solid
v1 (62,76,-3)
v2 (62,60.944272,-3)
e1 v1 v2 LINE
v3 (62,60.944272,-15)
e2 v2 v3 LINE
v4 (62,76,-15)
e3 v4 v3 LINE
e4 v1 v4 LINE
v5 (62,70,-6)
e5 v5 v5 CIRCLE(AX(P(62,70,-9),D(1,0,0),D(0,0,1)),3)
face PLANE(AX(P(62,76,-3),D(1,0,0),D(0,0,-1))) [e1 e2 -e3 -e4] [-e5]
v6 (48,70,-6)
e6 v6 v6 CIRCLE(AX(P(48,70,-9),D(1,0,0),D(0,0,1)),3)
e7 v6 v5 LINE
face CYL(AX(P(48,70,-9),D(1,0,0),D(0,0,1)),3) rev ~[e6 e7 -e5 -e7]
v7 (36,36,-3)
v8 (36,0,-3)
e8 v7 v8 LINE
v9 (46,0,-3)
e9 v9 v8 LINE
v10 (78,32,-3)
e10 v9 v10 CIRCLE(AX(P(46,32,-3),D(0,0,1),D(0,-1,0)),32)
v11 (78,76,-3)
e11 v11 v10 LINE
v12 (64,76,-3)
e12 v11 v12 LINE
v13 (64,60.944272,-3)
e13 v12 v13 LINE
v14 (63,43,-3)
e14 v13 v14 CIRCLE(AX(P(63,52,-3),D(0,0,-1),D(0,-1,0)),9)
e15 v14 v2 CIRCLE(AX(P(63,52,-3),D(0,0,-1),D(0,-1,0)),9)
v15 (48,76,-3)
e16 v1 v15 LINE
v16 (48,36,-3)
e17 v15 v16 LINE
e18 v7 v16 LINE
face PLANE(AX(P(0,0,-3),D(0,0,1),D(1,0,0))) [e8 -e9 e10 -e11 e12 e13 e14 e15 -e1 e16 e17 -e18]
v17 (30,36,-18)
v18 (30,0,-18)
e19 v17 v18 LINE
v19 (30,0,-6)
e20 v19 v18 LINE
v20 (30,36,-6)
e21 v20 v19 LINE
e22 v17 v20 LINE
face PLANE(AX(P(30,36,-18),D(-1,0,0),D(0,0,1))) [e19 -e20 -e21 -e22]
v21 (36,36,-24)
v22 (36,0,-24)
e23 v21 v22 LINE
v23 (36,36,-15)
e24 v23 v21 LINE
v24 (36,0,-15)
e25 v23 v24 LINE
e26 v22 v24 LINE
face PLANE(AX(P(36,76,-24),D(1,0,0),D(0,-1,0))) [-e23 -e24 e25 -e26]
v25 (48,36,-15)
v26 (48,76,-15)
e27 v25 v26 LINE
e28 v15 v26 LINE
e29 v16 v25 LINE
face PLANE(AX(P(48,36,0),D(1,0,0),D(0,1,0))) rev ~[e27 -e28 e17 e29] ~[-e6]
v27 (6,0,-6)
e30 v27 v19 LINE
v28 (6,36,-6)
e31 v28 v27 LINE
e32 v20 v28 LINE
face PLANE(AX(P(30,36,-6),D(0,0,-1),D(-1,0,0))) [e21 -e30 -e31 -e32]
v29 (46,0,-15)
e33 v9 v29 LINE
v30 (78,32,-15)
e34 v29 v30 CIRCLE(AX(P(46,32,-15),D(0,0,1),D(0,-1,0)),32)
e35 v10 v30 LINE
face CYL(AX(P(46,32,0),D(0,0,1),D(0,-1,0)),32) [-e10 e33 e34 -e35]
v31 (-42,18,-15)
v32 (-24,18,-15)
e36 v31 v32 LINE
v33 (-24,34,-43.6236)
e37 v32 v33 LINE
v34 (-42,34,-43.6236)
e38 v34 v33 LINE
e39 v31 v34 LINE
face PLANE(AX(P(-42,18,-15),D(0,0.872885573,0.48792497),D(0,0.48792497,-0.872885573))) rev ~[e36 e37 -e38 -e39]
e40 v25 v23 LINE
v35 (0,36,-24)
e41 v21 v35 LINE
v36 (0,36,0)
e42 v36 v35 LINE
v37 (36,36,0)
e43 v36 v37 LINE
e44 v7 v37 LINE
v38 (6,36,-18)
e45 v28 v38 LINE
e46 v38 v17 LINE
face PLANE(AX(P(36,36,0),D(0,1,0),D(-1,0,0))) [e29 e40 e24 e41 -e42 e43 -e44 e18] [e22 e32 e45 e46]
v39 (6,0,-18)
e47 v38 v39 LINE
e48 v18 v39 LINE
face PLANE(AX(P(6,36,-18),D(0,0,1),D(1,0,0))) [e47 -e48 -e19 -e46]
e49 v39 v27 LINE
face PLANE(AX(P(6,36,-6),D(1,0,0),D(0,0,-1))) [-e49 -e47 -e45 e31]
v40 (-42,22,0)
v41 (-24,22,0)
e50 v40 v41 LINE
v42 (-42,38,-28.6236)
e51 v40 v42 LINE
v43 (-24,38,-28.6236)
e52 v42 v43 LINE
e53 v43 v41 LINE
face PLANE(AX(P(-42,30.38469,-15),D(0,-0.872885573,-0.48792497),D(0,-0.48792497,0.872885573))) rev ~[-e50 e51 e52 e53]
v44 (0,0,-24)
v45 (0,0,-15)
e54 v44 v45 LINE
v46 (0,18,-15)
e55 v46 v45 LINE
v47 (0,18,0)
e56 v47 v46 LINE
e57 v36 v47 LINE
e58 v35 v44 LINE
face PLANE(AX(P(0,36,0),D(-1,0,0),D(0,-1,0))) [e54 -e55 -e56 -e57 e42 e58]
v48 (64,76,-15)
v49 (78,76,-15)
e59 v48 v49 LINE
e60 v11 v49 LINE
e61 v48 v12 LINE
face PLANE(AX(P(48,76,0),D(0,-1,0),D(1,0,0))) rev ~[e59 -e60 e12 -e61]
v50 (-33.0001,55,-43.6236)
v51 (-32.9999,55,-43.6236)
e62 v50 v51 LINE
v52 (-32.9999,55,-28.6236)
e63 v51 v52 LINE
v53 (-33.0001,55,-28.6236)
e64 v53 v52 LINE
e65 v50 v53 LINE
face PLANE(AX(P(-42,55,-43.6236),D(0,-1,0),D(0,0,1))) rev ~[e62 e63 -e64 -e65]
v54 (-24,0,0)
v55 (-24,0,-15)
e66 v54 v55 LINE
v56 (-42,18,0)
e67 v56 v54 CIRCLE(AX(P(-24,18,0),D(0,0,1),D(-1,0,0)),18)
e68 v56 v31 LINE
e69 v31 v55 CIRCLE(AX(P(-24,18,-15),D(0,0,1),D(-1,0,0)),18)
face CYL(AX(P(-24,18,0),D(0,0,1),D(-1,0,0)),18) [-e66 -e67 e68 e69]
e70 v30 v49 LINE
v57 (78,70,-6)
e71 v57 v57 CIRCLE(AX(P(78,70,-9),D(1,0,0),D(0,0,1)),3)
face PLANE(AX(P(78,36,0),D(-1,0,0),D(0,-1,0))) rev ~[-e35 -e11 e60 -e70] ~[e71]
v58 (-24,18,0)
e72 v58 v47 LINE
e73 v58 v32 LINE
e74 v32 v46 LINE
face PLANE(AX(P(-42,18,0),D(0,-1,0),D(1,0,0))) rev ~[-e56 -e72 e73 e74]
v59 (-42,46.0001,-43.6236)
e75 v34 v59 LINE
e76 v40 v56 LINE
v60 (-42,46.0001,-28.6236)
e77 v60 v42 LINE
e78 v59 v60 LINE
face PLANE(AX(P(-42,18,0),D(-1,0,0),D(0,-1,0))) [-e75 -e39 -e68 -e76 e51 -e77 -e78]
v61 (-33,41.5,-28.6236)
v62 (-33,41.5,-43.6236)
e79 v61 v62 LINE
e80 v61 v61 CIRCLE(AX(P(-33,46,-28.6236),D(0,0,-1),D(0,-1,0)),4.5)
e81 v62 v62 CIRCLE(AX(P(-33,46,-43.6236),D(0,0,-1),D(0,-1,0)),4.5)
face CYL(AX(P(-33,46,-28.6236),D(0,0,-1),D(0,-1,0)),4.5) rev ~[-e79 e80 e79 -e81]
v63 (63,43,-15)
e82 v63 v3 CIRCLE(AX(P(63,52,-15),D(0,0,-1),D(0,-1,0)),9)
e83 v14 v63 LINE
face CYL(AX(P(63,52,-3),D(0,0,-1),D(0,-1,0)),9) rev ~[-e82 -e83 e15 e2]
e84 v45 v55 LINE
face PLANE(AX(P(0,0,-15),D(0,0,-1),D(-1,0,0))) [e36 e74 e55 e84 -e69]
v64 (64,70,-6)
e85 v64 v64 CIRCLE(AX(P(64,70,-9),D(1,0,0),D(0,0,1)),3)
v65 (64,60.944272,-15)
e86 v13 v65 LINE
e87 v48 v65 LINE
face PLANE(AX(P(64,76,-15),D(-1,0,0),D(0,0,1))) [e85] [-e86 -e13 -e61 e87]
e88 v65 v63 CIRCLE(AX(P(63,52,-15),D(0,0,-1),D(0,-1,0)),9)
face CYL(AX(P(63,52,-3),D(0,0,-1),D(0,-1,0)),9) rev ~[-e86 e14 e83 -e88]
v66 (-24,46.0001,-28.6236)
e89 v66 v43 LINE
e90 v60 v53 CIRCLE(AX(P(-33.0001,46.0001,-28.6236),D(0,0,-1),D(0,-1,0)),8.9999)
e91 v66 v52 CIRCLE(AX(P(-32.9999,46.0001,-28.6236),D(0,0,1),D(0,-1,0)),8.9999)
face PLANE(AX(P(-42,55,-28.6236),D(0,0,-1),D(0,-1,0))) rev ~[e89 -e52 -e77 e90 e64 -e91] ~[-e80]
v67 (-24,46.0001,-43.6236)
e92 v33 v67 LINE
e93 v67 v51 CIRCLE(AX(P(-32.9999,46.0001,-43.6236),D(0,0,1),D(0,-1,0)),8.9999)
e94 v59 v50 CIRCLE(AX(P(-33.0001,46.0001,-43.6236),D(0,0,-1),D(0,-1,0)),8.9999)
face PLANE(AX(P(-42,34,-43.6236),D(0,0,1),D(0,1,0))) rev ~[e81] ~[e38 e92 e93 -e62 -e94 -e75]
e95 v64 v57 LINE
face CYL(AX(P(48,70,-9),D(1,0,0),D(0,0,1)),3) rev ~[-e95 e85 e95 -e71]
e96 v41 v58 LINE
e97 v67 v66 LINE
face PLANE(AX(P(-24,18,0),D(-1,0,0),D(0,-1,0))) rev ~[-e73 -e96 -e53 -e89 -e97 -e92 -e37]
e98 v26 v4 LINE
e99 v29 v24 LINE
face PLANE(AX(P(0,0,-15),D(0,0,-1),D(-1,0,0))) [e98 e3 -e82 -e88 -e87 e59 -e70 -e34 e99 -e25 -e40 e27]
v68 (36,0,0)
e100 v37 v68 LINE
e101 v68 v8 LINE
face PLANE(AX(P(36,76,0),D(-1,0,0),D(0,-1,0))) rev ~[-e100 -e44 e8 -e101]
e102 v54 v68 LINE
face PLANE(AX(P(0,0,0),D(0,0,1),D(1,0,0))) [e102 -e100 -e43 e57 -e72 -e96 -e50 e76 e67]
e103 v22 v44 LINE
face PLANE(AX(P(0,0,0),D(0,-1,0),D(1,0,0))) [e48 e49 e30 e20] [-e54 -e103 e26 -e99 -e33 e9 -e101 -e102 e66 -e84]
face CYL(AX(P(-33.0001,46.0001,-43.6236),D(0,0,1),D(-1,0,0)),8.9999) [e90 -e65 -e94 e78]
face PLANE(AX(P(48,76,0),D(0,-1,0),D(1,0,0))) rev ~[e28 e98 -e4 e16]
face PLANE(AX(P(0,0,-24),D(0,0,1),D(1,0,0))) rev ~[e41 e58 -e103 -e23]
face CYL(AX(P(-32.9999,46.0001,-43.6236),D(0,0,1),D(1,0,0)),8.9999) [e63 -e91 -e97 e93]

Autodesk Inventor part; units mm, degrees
ref_plane "YZ Plane" through (0, 0, 0) normal (1, 0, 0) x (0, 1, 0)
ref_plane "XZ Plane" through (0, 0, 0) normal (0, 1, 0) x (-1, 0, 0)
ref_plane "XY Plane" through (0, 0, 0) normal (0, 0, 1) x (1, 0, 0)
sketch "Szkic1" plane through (0, 0, 0) normal (0, 0, 1) x (1, 0, 0)
  line L0 (0, 0) -> (36, 0)
  line L1 (36, 0) -> (36, 36)
  line L2 (36, 36) -> (0, 36)
  line L3 (0, 36) -> (0, 0)
  line L4 (0, 0) -> (-24, 0)
  line L5 (-42, 18) -> (-42, 18)
  line L6 (-42, 18) -> (0, 18)
  line L7 (0, 18) -> (0, 0)
  line L8 (36, 36) -> (78, 36)
  line L9 (78, 36) -> (78, 32)
  line L10 (46, 0) -> (36, 0)
  line L11 (36, 0) -> (36, 36)
  line L12 (78, 36) -> (48, 36)
  line L13 (48, 36) -> (48, 76)
  line L14 (48, 76) -> (78, 76)
  line L15 (78, 76) -> (78, 36)
  arc A0 (46, 0) -> (78, 32) centre (46, 32) ccw
  arc A1 (-42, 18) -> (-24, 0) centre (-24, 18) ccw
  point P0 (-42, 0)
  point P1 (78, 0)
  dimension "d0" = 36
  dimension "d1" = 36
  dimension "d2" = 42
  dimension "d3" = 18
  dimension "d4" = 42
  dimension "d5" = 30
  dimension "d6" = 40
  dimension "d7" = 32
  dimension "d8" = 18
extrude "Wyciągnięcie proste1" add sketch "Szkic1" against normal blind 24
sketch "Szkic2" plane through (0, 0, 0) normal (0, 0, 1) x (1, 0, 0)
  line L0 (78, 76) -> (78, 32) projected
  line L1 (46, 0) -> (-24, 0) projected
  line L2 (78, 76) -> (36, 76)
  line L3 (36, 76) -> (36, 0)
  line L4 (36, 0) -> (78, 0)
  line L5 (78, 0) -> (78, 76)
  point P0 (0, 0)
extrude "Wyciągnięcie proste2" cut sketch "Szkic2" against normal blind 3
sketch "Szkic3" plane through (0, 0, -24) normal (0, 0, -1) x (-1, 0, 0)
  line L0 (-48, 76) -> (-78, 76) projected
  line L1 (-46, 0) -> (-36, 0) projected
  line L2 (-78, 76) -> (-36, 76)
  line L3 (-36, 76) -> (-36, 0)
  line L4 (-36, 0) -> (-78, 0)
  line L5 (-78, 0) -> (-78, 76)
  line L6 (0, 36) -> (0, 18) projected
  line L7 (0, 36) -> (42, 36)
  line L8 (42, 36) -> (42, 0)
  line L9 (42, 0) -> (0, 0)
  line L10 (0, 0) -> (0, 36)
  point P0 (0, 0)
extrude "Wyciągnięcie proste3" cut sketch "Szkic3" against normal blind 9 contours L2 L3 L1 L4 L5 L0
sketch "Szkic4" plane through (0, 0, -24) normal (0, 0, -1) x (-1, 0, 0)
  line L0 (42, 18) -> (0, 18) projected
  line L1 (0, 0) -> (42, 0)
  line L2 (42, 0) -> (42, 18)
  line L3 (42, 18) -> (0, 18)
  line L4 (0, 18) -> (0, 0)
extrude "Wyciągnięcie proste4" cut sketch "Szkic4" against normal blind 9
ref_plane "Płaszczyzna konstrukcyjna1" through (-42, 18, 0) normal (-1, 0, 0) x (0, -1, 0)
sketch "Szkic5" plane through (-42, 18, 0) normal (-1, 0, 0) x (0, -1, 0)
  line L0 (0, 0) -> (0, -15) projected
  line L1 (-18, -15) -> (18, -15) projected
  line L2 (0, -15) -> (-16, -43.6236)
  line L3 (-16, -43.6236) -> (-37, -43.6236)
  line L4 (-37, -43.6236) -> (-37, -28.6236)
  line L5 (-37, -28.6236) -> (-20, -28.6236)
  line L6 (-20, -28.6236) -> (-4, 0)
  line L7 (-18, 0) -> (0, 0) projected
  line L8 (0, 0) -> (0, -15)
  point P0 (18, 0)
  point P1 (-28.5, -28.6236)
  dimension "d17" = 16
  dimension "d18" = 15
  dimension "d19" = 4
  dimension "d20" = 16
  dimension "d21" = 21
extrude "Wyciągnięcie proste5" add sketch "Szkic5" against normal blind 18
full round fillet "Zaokrąglenie pełne1" first side at (-24, 26, -14.5412) centre faces at (-36, 55, -33.6236) second side at (-42, 26, -14.5412)
sketch "Szkic6" plane through (-42, 38, -28.6236) normal (0, 0, 1) x (1, 0, 0)
  arc A0 (18, 8) -> (0, 8) centre (9, 8) ccw projected
  point P0 (42, -38)
hole "Otwór1" at (-33, 46, -28.6236) direction (0, 0, -1) diameter 9 end through all
sketch "Szkic7" plane through (48, 36, -3) normal (-1, 0, 0) x (0, 0, 1)
  point P0 (3, -36)
  point P1 (-6, 34)
hole "Otwór2" at (48, 70, -9) direction (1, 0, 0) diameter 6 end through all
sketch "Szkic8" plane through (0, 0, -3) normal (0, 0, 1) x (1, 0, 0)
  point P0 (0, 0)
  point P1 (63, 52)
hole "Otwór3" at (63, 52, -3) direction (0, 0, -1) diameter 18 end through all
sketch "Szkic9" plane through (48, 76, -3) normal (0, 1, 0) x (1, 0, 0)
  line L0 (0, 0) -> (30, 0) projected
  line L1 (14, 12) -> (16, 12)
  line L2 (16, 12) -> (16, 0)
  line L3 (16, 0) -> (14, 0)
  line L4 (14, 0) -> (14, 12)
  line L5 (30, 0) -> (30, 12) projected
  point P0 (-48, -3)
  point P1 (14, 0)
  dimension "d45" = 2
  dimension "d46" = 14
extrude "Wyciągnięcie proste6" cut sketch "Szkic9" against normal up to surface
sketch "Szkic10" plane through (0, 36, 0) normal (0, 1, 0) x (1, 0, 0)
  line L0 (6, 18) -> (30, 18)
  line L1 (30, 18) -> (30, 6)
  line L2 (30, 6) -> (6, 6)
  line L3 (6, 6) -> (6, 18)
  line L4 (0, 24) -> (36, 24) projected
  line L5 (0, 0) -> (0, 24) projected
  point P0 (6, 12)
  dimension "d49" = 24
  dimension "d50" = 12
  dimension "d51" = 6
  dimension "d52" = 6
extrude "Wyciągnięcie proste7" cut sketch "Szkic10" against normal through all
